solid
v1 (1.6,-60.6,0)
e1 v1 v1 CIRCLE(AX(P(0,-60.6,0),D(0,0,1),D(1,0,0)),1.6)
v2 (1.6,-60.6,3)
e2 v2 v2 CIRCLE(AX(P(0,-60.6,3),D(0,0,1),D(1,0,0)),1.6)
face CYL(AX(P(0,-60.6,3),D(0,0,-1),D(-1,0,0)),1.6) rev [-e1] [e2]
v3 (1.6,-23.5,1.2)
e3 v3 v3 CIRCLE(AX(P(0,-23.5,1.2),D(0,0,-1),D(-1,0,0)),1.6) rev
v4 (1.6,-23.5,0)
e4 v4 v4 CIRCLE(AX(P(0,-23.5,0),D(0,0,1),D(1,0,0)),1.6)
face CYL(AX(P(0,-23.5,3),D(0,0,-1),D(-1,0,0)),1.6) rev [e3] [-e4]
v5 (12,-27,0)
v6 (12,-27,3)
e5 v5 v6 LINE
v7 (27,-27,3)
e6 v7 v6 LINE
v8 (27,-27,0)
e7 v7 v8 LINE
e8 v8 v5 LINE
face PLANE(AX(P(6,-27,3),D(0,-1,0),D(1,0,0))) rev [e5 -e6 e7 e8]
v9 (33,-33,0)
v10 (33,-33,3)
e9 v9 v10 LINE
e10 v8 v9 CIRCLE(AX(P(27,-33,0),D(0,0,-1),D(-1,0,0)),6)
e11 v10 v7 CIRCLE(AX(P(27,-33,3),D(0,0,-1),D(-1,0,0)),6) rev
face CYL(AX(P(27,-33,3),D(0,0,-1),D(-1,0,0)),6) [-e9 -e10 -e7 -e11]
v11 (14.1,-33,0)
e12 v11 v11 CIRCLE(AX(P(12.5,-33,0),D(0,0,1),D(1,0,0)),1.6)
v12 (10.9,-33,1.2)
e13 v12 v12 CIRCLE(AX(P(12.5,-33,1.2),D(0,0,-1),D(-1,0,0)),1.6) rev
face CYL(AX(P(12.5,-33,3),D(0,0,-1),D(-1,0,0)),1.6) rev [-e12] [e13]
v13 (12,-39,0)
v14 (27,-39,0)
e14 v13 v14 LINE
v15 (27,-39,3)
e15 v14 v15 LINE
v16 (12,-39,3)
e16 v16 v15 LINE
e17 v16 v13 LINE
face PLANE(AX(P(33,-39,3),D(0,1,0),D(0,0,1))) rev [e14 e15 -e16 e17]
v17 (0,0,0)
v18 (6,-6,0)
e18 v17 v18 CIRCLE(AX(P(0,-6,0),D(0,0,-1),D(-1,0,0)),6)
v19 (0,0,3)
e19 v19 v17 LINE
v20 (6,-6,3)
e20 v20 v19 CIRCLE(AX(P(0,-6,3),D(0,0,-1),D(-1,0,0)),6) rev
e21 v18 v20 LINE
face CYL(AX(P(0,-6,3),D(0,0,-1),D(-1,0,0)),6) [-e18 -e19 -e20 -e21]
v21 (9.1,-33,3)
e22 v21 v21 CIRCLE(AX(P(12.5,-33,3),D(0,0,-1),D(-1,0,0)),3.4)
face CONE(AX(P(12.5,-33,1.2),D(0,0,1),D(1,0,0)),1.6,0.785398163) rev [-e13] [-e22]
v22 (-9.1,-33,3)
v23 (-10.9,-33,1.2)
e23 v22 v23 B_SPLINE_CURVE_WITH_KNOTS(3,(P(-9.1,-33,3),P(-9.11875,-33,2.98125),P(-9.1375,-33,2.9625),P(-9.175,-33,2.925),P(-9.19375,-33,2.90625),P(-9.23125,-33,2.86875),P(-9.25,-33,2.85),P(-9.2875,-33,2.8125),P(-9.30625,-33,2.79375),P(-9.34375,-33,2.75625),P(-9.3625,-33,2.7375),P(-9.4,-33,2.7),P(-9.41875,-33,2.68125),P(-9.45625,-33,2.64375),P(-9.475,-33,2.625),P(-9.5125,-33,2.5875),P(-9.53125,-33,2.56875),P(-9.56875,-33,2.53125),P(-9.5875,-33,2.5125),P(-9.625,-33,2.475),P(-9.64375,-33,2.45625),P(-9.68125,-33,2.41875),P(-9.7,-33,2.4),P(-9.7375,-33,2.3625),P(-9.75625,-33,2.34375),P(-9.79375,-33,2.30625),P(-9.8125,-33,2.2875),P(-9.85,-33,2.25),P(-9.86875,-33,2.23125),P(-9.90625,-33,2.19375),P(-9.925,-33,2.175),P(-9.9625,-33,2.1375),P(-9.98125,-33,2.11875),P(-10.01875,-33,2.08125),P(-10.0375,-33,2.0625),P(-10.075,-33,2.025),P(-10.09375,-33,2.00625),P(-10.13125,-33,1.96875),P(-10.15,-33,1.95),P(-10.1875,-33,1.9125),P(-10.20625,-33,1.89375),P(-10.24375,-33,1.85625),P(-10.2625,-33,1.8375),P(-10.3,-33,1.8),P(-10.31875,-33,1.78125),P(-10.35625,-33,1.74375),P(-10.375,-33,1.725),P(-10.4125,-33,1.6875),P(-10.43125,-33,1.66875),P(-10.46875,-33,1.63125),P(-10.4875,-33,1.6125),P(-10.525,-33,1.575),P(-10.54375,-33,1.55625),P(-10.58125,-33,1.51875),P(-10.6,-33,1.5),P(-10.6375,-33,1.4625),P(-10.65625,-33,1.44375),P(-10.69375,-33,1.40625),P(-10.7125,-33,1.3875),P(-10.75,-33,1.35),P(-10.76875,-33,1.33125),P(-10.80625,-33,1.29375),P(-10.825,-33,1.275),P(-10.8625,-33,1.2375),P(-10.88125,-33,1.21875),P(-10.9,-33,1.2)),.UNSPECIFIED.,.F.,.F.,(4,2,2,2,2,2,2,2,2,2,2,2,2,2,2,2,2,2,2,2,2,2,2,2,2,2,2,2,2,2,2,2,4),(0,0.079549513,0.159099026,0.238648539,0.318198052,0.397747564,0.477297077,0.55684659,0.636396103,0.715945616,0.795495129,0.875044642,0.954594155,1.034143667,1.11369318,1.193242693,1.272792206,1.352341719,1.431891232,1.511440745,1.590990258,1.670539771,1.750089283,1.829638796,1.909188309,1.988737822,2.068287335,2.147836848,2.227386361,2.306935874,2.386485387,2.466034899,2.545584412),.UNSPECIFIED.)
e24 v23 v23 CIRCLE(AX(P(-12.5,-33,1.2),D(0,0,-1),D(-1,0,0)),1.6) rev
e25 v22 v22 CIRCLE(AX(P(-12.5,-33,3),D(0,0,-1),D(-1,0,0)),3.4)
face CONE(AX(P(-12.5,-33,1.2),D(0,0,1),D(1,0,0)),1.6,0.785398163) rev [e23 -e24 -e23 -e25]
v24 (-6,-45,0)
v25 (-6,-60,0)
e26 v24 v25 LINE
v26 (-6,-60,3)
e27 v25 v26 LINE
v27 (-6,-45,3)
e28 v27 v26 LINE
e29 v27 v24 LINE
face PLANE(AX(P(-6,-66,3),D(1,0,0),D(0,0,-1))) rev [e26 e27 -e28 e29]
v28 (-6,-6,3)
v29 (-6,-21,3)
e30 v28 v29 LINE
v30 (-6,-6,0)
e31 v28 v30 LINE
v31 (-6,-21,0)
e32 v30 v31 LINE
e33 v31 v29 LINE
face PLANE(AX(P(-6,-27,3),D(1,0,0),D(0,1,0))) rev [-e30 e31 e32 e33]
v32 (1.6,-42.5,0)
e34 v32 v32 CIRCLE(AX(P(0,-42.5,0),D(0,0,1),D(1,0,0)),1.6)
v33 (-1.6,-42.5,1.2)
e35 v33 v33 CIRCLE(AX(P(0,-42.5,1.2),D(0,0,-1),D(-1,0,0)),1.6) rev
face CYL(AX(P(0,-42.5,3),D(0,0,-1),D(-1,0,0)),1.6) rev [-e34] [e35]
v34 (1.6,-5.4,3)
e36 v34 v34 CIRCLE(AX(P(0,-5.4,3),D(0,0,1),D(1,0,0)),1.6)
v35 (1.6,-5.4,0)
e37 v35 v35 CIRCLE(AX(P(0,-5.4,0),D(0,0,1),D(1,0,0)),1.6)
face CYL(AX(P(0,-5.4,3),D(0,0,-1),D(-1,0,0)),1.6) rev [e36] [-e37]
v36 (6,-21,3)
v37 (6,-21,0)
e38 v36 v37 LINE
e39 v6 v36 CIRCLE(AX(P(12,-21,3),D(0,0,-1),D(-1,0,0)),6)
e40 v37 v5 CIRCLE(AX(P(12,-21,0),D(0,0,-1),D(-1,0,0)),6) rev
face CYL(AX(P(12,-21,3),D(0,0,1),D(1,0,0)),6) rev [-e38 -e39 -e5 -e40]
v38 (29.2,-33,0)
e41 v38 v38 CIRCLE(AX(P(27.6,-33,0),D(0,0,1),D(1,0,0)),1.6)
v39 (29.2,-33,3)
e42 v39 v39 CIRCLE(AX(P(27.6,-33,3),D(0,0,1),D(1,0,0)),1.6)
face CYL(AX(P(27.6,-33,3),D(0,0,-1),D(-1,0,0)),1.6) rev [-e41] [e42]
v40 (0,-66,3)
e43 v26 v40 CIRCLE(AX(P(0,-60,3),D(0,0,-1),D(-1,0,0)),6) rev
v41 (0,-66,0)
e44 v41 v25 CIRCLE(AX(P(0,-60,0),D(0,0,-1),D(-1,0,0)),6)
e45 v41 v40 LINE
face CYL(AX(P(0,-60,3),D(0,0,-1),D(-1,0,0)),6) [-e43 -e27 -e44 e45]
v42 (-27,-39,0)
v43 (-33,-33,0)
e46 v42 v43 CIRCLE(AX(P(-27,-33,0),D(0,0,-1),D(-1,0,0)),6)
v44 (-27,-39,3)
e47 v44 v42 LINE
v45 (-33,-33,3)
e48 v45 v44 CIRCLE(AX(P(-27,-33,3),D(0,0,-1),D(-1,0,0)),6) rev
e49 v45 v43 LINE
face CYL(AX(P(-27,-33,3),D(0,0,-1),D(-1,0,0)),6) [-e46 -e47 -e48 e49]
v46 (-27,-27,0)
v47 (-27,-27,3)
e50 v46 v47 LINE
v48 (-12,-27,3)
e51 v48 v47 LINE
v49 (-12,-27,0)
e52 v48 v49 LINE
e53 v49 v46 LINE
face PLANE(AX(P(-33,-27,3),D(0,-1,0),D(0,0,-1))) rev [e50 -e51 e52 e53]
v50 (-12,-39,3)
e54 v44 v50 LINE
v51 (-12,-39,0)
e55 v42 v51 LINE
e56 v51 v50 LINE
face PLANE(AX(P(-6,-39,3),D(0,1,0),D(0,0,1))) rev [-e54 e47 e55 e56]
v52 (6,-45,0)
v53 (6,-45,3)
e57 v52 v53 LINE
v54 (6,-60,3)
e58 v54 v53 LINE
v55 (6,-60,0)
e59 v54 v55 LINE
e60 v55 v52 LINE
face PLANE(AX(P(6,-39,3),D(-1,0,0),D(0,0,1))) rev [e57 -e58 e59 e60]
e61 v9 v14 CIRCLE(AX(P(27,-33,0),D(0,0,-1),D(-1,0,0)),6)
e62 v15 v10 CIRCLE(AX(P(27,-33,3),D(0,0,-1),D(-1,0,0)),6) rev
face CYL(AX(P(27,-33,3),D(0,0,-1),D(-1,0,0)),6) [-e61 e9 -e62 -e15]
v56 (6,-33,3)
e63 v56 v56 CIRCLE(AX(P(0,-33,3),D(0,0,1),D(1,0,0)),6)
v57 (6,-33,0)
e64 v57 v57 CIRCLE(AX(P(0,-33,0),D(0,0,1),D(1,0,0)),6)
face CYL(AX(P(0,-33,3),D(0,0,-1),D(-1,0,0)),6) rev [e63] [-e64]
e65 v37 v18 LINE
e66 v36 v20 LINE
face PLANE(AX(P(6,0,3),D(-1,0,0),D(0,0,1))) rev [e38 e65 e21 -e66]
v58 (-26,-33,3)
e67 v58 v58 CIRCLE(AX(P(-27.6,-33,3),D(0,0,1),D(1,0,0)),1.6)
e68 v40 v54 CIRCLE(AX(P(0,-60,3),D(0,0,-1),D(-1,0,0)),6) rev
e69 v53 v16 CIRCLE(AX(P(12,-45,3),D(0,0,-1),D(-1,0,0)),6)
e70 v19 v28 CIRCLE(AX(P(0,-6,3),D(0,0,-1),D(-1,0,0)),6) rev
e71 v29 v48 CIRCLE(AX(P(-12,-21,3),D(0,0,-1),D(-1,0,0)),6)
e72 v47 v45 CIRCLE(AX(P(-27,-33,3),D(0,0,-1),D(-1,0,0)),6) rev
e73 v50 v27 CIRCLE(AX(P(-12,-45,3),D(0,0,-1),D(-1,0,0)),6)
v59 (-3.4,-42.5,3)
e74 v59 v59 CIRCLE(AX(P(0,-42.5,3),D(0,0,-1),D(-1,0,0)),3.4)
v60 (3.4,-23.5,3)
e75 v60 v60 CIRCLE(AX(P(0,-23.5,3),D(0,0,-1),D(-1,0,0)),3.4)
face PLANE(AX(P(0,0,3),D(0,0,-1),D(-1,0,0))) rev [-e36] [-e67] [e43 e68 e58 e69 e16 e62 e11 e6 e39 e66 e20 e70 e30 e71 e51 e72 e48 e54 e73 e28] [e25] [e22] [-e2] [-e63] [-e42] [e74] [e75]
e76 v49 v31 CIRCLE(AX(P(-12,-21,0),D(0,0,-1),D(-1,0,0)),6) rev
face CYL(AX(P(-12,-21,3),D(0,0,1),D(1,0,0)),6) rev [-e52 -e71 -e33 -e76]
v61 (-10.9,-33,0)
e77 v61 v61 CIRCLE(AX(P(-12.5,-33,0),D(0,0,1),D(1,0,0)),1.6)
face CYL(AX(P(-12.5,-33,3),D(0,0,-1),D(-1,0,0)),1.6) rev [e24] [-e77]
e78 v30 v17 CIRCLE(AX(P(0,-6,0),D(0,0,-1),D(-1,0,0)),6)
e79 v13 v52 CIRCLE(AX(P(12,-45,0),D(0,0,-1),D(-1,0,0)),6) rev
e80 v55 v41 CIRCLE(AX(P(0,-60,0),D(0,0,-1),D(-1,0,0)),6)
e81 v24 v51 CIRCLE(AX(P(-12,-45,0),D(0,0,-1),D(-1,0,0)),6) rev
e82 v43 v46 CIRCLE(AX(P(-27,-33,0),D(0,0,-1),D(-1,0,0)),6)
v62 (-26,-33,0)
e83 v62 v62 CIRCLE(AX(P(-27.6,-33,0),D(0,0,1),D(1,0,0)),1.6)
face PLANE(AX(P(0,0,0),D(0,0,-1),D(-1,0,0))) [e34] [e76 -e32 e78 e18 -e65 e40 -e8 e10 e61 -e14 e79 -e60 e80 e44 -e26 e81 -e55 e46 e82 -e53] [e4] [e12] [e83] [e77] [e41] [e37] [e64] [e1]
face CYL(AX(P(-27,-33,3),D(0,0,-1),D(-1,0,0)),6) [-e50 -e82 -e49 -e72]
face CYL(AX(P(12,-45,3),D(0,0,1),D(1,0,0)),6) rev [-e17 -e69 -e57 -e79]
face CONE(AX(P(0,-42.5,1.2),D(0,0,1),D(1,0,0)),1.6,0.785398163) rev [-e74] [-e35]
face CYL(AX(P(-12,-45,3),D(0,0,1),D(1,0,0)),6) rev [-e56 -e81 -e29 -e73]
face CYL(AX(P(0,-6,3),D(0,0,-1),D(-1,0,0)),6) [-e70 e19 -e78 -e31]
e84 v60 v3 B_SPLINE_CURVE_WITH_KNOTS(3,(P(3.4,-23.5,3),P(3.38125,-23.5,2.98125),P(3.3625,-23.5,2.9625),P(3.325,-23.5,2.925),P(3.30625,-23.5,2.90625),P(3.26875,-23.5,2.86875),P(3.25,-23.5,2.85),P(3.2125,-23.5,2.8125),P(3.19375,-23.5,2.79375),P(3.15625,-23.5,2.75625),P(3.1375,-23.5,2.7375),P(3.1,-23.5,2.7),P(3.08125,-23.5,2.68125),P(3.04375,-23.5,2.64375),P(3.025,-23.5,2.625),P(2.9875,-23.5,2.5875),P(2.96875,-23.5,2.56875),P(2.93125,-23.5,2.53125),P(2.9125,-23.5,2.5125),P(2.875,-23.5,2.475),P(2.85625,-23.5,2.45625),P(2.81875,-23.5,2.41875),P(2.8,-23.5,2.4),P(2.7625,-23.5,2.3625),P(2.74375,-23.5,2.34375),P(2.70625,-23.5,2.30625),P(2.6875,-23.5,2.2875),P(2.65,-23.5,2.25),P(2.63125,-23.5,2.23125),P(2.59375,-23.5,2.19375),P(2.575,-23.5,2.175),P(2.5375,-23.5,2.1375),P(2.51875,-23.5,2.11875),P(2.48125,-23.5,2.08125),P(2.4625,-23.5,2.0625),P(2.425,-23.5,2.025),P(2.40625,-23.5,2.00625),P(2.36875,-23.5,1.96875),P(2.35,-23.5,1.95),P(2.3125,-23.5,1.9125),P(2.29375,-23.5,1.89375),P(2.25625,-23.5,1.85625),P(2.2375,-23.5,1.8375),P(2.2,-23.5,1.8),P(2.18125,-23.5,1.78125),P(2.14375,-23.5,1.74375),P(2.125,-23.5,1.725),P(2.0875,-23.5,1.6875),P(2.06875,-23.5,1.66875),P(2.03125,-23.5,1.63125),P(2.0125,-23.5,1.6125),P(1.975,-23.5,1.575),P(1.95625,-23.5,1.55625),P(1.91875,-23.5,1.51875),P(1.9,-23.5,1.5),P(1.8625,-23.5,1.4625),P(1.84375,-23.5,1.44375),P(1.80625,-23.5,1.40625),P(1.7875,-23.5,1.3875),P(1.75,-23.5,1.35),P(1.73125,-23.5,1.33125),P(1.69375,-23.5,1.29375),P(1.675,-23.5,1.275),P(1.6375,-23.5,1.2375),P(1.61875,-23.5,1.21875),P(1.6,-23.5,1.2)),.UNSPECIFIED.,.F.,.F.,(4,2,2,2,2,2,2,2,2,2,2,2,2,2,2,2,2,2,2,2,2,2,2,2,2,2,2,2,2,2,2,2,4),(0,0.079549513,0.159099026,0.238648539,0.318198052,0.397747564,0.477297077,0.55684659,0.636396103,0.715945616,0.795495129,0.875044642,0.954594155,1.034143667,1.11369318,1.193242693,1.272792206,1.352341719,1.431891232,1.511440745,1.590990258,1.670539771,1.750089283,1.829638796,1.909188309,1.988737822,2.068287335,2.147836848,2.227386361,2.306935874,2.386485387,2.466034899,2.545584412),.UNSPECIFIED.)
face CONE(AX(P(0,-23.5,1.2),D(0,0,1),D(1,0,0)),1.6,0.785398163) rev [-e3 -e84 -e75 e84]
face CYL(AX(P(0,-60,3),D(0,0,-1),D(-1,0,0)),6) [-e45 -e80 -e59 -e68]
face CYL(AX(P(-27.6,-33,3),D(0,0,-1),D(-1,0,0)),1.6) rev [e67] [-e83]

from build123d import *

# Parameters (mm, degrees)
SKETCH_1_R      = 1.6
SKETCH_1_R_2    = 6
EXTRUDE_1_DEPTH = 3
FILLET_1_R      = 6
CHAMFER_1_SIZE  = 1.8


with BuildPart() as part:
    # 草图1 → 凸台-拉伸1 (new body)
    with BuildSketch(Plane.XY):
        Polygon((-6, 0), (6, 0), (6, -27), (33, -27), (33, -39), (6, -39), (6, -66), (-6, -66), (-6, -39), (-33, -39), (-33, -27), (-6, -27), align=None)
        with Locations((0, -5.4)):
            Circle(SKETCH_1_R, mode=Mode.SUBTRACT)
        with Locations((-27.6, -33)):
            Circle(SKETCH_1_R, mode=Mode.SUBTRACT)
        with Locations((27.6, -33)):
            Circle(SKETCH_1_R, mode=Mode.SUBTRACT)
        with Locations((0, -60.6)):
            Circle(SKETCH_1_R, mode=Mode.SUBTRACT)
        with Locations((0, -23.5)):
            Circle(SKETCH_1_R, mode=Mode.SUBTRACT)
        with Locations((12.5, -33)):
            Circle(SKETCH_1_R, mode=Mode.SUBTRACT)
        with Locations((0, -42.5)):
            Circle(SKETCH_1_R, mode=Mode.SUBTRACT)
        with Locations((-12.5, -33)):
            Circle(SKETCH_1_R, mode=Mode.SUBTRACT)
        with Locations((0, -33)):
            Circle(SKETCH_1_R_2, mode=Mode.SUBTRACT)
    extrude(amount=EXTRUDE_1_DEPTH)

    # 圆角1
    fillet_1_edges = [part.edges().sort_by_distance(p)[0] for p in [
        (-6, -39, 1.5),
        (-6, -66, 1.5),
        (6, -66, 1.5),
        (6, -39, 1.5),
        (33, -39, 1.5),
        (33, -27, 1.5),
        (-6, 0, 1.5),
        (6, 0, 1.5),
        (6, -27, 1.5),
        (-6, -27, 1.5),
        (-33, -39, 1.5),
        (-33, -27, 1.5),
    ]]
    fillet(fillet_1_edges, radius=FILLET_1_R - 0.0001)  # a hair under: the kernel refuses the full size

    # 倒角1
    chamfer_1_edges = [part.edges().sort_by_distance(p)[0] for p in [
        (-1.6, -23.5, 3),
        (10.9, -33, 3),
        (-1.6, -42.5, 3),
        (-14.1, -33, 3),
    ]]
    chamfer(chamfer_1_edges, length=CHAMFER_1_SIZE)


solid = part.part
